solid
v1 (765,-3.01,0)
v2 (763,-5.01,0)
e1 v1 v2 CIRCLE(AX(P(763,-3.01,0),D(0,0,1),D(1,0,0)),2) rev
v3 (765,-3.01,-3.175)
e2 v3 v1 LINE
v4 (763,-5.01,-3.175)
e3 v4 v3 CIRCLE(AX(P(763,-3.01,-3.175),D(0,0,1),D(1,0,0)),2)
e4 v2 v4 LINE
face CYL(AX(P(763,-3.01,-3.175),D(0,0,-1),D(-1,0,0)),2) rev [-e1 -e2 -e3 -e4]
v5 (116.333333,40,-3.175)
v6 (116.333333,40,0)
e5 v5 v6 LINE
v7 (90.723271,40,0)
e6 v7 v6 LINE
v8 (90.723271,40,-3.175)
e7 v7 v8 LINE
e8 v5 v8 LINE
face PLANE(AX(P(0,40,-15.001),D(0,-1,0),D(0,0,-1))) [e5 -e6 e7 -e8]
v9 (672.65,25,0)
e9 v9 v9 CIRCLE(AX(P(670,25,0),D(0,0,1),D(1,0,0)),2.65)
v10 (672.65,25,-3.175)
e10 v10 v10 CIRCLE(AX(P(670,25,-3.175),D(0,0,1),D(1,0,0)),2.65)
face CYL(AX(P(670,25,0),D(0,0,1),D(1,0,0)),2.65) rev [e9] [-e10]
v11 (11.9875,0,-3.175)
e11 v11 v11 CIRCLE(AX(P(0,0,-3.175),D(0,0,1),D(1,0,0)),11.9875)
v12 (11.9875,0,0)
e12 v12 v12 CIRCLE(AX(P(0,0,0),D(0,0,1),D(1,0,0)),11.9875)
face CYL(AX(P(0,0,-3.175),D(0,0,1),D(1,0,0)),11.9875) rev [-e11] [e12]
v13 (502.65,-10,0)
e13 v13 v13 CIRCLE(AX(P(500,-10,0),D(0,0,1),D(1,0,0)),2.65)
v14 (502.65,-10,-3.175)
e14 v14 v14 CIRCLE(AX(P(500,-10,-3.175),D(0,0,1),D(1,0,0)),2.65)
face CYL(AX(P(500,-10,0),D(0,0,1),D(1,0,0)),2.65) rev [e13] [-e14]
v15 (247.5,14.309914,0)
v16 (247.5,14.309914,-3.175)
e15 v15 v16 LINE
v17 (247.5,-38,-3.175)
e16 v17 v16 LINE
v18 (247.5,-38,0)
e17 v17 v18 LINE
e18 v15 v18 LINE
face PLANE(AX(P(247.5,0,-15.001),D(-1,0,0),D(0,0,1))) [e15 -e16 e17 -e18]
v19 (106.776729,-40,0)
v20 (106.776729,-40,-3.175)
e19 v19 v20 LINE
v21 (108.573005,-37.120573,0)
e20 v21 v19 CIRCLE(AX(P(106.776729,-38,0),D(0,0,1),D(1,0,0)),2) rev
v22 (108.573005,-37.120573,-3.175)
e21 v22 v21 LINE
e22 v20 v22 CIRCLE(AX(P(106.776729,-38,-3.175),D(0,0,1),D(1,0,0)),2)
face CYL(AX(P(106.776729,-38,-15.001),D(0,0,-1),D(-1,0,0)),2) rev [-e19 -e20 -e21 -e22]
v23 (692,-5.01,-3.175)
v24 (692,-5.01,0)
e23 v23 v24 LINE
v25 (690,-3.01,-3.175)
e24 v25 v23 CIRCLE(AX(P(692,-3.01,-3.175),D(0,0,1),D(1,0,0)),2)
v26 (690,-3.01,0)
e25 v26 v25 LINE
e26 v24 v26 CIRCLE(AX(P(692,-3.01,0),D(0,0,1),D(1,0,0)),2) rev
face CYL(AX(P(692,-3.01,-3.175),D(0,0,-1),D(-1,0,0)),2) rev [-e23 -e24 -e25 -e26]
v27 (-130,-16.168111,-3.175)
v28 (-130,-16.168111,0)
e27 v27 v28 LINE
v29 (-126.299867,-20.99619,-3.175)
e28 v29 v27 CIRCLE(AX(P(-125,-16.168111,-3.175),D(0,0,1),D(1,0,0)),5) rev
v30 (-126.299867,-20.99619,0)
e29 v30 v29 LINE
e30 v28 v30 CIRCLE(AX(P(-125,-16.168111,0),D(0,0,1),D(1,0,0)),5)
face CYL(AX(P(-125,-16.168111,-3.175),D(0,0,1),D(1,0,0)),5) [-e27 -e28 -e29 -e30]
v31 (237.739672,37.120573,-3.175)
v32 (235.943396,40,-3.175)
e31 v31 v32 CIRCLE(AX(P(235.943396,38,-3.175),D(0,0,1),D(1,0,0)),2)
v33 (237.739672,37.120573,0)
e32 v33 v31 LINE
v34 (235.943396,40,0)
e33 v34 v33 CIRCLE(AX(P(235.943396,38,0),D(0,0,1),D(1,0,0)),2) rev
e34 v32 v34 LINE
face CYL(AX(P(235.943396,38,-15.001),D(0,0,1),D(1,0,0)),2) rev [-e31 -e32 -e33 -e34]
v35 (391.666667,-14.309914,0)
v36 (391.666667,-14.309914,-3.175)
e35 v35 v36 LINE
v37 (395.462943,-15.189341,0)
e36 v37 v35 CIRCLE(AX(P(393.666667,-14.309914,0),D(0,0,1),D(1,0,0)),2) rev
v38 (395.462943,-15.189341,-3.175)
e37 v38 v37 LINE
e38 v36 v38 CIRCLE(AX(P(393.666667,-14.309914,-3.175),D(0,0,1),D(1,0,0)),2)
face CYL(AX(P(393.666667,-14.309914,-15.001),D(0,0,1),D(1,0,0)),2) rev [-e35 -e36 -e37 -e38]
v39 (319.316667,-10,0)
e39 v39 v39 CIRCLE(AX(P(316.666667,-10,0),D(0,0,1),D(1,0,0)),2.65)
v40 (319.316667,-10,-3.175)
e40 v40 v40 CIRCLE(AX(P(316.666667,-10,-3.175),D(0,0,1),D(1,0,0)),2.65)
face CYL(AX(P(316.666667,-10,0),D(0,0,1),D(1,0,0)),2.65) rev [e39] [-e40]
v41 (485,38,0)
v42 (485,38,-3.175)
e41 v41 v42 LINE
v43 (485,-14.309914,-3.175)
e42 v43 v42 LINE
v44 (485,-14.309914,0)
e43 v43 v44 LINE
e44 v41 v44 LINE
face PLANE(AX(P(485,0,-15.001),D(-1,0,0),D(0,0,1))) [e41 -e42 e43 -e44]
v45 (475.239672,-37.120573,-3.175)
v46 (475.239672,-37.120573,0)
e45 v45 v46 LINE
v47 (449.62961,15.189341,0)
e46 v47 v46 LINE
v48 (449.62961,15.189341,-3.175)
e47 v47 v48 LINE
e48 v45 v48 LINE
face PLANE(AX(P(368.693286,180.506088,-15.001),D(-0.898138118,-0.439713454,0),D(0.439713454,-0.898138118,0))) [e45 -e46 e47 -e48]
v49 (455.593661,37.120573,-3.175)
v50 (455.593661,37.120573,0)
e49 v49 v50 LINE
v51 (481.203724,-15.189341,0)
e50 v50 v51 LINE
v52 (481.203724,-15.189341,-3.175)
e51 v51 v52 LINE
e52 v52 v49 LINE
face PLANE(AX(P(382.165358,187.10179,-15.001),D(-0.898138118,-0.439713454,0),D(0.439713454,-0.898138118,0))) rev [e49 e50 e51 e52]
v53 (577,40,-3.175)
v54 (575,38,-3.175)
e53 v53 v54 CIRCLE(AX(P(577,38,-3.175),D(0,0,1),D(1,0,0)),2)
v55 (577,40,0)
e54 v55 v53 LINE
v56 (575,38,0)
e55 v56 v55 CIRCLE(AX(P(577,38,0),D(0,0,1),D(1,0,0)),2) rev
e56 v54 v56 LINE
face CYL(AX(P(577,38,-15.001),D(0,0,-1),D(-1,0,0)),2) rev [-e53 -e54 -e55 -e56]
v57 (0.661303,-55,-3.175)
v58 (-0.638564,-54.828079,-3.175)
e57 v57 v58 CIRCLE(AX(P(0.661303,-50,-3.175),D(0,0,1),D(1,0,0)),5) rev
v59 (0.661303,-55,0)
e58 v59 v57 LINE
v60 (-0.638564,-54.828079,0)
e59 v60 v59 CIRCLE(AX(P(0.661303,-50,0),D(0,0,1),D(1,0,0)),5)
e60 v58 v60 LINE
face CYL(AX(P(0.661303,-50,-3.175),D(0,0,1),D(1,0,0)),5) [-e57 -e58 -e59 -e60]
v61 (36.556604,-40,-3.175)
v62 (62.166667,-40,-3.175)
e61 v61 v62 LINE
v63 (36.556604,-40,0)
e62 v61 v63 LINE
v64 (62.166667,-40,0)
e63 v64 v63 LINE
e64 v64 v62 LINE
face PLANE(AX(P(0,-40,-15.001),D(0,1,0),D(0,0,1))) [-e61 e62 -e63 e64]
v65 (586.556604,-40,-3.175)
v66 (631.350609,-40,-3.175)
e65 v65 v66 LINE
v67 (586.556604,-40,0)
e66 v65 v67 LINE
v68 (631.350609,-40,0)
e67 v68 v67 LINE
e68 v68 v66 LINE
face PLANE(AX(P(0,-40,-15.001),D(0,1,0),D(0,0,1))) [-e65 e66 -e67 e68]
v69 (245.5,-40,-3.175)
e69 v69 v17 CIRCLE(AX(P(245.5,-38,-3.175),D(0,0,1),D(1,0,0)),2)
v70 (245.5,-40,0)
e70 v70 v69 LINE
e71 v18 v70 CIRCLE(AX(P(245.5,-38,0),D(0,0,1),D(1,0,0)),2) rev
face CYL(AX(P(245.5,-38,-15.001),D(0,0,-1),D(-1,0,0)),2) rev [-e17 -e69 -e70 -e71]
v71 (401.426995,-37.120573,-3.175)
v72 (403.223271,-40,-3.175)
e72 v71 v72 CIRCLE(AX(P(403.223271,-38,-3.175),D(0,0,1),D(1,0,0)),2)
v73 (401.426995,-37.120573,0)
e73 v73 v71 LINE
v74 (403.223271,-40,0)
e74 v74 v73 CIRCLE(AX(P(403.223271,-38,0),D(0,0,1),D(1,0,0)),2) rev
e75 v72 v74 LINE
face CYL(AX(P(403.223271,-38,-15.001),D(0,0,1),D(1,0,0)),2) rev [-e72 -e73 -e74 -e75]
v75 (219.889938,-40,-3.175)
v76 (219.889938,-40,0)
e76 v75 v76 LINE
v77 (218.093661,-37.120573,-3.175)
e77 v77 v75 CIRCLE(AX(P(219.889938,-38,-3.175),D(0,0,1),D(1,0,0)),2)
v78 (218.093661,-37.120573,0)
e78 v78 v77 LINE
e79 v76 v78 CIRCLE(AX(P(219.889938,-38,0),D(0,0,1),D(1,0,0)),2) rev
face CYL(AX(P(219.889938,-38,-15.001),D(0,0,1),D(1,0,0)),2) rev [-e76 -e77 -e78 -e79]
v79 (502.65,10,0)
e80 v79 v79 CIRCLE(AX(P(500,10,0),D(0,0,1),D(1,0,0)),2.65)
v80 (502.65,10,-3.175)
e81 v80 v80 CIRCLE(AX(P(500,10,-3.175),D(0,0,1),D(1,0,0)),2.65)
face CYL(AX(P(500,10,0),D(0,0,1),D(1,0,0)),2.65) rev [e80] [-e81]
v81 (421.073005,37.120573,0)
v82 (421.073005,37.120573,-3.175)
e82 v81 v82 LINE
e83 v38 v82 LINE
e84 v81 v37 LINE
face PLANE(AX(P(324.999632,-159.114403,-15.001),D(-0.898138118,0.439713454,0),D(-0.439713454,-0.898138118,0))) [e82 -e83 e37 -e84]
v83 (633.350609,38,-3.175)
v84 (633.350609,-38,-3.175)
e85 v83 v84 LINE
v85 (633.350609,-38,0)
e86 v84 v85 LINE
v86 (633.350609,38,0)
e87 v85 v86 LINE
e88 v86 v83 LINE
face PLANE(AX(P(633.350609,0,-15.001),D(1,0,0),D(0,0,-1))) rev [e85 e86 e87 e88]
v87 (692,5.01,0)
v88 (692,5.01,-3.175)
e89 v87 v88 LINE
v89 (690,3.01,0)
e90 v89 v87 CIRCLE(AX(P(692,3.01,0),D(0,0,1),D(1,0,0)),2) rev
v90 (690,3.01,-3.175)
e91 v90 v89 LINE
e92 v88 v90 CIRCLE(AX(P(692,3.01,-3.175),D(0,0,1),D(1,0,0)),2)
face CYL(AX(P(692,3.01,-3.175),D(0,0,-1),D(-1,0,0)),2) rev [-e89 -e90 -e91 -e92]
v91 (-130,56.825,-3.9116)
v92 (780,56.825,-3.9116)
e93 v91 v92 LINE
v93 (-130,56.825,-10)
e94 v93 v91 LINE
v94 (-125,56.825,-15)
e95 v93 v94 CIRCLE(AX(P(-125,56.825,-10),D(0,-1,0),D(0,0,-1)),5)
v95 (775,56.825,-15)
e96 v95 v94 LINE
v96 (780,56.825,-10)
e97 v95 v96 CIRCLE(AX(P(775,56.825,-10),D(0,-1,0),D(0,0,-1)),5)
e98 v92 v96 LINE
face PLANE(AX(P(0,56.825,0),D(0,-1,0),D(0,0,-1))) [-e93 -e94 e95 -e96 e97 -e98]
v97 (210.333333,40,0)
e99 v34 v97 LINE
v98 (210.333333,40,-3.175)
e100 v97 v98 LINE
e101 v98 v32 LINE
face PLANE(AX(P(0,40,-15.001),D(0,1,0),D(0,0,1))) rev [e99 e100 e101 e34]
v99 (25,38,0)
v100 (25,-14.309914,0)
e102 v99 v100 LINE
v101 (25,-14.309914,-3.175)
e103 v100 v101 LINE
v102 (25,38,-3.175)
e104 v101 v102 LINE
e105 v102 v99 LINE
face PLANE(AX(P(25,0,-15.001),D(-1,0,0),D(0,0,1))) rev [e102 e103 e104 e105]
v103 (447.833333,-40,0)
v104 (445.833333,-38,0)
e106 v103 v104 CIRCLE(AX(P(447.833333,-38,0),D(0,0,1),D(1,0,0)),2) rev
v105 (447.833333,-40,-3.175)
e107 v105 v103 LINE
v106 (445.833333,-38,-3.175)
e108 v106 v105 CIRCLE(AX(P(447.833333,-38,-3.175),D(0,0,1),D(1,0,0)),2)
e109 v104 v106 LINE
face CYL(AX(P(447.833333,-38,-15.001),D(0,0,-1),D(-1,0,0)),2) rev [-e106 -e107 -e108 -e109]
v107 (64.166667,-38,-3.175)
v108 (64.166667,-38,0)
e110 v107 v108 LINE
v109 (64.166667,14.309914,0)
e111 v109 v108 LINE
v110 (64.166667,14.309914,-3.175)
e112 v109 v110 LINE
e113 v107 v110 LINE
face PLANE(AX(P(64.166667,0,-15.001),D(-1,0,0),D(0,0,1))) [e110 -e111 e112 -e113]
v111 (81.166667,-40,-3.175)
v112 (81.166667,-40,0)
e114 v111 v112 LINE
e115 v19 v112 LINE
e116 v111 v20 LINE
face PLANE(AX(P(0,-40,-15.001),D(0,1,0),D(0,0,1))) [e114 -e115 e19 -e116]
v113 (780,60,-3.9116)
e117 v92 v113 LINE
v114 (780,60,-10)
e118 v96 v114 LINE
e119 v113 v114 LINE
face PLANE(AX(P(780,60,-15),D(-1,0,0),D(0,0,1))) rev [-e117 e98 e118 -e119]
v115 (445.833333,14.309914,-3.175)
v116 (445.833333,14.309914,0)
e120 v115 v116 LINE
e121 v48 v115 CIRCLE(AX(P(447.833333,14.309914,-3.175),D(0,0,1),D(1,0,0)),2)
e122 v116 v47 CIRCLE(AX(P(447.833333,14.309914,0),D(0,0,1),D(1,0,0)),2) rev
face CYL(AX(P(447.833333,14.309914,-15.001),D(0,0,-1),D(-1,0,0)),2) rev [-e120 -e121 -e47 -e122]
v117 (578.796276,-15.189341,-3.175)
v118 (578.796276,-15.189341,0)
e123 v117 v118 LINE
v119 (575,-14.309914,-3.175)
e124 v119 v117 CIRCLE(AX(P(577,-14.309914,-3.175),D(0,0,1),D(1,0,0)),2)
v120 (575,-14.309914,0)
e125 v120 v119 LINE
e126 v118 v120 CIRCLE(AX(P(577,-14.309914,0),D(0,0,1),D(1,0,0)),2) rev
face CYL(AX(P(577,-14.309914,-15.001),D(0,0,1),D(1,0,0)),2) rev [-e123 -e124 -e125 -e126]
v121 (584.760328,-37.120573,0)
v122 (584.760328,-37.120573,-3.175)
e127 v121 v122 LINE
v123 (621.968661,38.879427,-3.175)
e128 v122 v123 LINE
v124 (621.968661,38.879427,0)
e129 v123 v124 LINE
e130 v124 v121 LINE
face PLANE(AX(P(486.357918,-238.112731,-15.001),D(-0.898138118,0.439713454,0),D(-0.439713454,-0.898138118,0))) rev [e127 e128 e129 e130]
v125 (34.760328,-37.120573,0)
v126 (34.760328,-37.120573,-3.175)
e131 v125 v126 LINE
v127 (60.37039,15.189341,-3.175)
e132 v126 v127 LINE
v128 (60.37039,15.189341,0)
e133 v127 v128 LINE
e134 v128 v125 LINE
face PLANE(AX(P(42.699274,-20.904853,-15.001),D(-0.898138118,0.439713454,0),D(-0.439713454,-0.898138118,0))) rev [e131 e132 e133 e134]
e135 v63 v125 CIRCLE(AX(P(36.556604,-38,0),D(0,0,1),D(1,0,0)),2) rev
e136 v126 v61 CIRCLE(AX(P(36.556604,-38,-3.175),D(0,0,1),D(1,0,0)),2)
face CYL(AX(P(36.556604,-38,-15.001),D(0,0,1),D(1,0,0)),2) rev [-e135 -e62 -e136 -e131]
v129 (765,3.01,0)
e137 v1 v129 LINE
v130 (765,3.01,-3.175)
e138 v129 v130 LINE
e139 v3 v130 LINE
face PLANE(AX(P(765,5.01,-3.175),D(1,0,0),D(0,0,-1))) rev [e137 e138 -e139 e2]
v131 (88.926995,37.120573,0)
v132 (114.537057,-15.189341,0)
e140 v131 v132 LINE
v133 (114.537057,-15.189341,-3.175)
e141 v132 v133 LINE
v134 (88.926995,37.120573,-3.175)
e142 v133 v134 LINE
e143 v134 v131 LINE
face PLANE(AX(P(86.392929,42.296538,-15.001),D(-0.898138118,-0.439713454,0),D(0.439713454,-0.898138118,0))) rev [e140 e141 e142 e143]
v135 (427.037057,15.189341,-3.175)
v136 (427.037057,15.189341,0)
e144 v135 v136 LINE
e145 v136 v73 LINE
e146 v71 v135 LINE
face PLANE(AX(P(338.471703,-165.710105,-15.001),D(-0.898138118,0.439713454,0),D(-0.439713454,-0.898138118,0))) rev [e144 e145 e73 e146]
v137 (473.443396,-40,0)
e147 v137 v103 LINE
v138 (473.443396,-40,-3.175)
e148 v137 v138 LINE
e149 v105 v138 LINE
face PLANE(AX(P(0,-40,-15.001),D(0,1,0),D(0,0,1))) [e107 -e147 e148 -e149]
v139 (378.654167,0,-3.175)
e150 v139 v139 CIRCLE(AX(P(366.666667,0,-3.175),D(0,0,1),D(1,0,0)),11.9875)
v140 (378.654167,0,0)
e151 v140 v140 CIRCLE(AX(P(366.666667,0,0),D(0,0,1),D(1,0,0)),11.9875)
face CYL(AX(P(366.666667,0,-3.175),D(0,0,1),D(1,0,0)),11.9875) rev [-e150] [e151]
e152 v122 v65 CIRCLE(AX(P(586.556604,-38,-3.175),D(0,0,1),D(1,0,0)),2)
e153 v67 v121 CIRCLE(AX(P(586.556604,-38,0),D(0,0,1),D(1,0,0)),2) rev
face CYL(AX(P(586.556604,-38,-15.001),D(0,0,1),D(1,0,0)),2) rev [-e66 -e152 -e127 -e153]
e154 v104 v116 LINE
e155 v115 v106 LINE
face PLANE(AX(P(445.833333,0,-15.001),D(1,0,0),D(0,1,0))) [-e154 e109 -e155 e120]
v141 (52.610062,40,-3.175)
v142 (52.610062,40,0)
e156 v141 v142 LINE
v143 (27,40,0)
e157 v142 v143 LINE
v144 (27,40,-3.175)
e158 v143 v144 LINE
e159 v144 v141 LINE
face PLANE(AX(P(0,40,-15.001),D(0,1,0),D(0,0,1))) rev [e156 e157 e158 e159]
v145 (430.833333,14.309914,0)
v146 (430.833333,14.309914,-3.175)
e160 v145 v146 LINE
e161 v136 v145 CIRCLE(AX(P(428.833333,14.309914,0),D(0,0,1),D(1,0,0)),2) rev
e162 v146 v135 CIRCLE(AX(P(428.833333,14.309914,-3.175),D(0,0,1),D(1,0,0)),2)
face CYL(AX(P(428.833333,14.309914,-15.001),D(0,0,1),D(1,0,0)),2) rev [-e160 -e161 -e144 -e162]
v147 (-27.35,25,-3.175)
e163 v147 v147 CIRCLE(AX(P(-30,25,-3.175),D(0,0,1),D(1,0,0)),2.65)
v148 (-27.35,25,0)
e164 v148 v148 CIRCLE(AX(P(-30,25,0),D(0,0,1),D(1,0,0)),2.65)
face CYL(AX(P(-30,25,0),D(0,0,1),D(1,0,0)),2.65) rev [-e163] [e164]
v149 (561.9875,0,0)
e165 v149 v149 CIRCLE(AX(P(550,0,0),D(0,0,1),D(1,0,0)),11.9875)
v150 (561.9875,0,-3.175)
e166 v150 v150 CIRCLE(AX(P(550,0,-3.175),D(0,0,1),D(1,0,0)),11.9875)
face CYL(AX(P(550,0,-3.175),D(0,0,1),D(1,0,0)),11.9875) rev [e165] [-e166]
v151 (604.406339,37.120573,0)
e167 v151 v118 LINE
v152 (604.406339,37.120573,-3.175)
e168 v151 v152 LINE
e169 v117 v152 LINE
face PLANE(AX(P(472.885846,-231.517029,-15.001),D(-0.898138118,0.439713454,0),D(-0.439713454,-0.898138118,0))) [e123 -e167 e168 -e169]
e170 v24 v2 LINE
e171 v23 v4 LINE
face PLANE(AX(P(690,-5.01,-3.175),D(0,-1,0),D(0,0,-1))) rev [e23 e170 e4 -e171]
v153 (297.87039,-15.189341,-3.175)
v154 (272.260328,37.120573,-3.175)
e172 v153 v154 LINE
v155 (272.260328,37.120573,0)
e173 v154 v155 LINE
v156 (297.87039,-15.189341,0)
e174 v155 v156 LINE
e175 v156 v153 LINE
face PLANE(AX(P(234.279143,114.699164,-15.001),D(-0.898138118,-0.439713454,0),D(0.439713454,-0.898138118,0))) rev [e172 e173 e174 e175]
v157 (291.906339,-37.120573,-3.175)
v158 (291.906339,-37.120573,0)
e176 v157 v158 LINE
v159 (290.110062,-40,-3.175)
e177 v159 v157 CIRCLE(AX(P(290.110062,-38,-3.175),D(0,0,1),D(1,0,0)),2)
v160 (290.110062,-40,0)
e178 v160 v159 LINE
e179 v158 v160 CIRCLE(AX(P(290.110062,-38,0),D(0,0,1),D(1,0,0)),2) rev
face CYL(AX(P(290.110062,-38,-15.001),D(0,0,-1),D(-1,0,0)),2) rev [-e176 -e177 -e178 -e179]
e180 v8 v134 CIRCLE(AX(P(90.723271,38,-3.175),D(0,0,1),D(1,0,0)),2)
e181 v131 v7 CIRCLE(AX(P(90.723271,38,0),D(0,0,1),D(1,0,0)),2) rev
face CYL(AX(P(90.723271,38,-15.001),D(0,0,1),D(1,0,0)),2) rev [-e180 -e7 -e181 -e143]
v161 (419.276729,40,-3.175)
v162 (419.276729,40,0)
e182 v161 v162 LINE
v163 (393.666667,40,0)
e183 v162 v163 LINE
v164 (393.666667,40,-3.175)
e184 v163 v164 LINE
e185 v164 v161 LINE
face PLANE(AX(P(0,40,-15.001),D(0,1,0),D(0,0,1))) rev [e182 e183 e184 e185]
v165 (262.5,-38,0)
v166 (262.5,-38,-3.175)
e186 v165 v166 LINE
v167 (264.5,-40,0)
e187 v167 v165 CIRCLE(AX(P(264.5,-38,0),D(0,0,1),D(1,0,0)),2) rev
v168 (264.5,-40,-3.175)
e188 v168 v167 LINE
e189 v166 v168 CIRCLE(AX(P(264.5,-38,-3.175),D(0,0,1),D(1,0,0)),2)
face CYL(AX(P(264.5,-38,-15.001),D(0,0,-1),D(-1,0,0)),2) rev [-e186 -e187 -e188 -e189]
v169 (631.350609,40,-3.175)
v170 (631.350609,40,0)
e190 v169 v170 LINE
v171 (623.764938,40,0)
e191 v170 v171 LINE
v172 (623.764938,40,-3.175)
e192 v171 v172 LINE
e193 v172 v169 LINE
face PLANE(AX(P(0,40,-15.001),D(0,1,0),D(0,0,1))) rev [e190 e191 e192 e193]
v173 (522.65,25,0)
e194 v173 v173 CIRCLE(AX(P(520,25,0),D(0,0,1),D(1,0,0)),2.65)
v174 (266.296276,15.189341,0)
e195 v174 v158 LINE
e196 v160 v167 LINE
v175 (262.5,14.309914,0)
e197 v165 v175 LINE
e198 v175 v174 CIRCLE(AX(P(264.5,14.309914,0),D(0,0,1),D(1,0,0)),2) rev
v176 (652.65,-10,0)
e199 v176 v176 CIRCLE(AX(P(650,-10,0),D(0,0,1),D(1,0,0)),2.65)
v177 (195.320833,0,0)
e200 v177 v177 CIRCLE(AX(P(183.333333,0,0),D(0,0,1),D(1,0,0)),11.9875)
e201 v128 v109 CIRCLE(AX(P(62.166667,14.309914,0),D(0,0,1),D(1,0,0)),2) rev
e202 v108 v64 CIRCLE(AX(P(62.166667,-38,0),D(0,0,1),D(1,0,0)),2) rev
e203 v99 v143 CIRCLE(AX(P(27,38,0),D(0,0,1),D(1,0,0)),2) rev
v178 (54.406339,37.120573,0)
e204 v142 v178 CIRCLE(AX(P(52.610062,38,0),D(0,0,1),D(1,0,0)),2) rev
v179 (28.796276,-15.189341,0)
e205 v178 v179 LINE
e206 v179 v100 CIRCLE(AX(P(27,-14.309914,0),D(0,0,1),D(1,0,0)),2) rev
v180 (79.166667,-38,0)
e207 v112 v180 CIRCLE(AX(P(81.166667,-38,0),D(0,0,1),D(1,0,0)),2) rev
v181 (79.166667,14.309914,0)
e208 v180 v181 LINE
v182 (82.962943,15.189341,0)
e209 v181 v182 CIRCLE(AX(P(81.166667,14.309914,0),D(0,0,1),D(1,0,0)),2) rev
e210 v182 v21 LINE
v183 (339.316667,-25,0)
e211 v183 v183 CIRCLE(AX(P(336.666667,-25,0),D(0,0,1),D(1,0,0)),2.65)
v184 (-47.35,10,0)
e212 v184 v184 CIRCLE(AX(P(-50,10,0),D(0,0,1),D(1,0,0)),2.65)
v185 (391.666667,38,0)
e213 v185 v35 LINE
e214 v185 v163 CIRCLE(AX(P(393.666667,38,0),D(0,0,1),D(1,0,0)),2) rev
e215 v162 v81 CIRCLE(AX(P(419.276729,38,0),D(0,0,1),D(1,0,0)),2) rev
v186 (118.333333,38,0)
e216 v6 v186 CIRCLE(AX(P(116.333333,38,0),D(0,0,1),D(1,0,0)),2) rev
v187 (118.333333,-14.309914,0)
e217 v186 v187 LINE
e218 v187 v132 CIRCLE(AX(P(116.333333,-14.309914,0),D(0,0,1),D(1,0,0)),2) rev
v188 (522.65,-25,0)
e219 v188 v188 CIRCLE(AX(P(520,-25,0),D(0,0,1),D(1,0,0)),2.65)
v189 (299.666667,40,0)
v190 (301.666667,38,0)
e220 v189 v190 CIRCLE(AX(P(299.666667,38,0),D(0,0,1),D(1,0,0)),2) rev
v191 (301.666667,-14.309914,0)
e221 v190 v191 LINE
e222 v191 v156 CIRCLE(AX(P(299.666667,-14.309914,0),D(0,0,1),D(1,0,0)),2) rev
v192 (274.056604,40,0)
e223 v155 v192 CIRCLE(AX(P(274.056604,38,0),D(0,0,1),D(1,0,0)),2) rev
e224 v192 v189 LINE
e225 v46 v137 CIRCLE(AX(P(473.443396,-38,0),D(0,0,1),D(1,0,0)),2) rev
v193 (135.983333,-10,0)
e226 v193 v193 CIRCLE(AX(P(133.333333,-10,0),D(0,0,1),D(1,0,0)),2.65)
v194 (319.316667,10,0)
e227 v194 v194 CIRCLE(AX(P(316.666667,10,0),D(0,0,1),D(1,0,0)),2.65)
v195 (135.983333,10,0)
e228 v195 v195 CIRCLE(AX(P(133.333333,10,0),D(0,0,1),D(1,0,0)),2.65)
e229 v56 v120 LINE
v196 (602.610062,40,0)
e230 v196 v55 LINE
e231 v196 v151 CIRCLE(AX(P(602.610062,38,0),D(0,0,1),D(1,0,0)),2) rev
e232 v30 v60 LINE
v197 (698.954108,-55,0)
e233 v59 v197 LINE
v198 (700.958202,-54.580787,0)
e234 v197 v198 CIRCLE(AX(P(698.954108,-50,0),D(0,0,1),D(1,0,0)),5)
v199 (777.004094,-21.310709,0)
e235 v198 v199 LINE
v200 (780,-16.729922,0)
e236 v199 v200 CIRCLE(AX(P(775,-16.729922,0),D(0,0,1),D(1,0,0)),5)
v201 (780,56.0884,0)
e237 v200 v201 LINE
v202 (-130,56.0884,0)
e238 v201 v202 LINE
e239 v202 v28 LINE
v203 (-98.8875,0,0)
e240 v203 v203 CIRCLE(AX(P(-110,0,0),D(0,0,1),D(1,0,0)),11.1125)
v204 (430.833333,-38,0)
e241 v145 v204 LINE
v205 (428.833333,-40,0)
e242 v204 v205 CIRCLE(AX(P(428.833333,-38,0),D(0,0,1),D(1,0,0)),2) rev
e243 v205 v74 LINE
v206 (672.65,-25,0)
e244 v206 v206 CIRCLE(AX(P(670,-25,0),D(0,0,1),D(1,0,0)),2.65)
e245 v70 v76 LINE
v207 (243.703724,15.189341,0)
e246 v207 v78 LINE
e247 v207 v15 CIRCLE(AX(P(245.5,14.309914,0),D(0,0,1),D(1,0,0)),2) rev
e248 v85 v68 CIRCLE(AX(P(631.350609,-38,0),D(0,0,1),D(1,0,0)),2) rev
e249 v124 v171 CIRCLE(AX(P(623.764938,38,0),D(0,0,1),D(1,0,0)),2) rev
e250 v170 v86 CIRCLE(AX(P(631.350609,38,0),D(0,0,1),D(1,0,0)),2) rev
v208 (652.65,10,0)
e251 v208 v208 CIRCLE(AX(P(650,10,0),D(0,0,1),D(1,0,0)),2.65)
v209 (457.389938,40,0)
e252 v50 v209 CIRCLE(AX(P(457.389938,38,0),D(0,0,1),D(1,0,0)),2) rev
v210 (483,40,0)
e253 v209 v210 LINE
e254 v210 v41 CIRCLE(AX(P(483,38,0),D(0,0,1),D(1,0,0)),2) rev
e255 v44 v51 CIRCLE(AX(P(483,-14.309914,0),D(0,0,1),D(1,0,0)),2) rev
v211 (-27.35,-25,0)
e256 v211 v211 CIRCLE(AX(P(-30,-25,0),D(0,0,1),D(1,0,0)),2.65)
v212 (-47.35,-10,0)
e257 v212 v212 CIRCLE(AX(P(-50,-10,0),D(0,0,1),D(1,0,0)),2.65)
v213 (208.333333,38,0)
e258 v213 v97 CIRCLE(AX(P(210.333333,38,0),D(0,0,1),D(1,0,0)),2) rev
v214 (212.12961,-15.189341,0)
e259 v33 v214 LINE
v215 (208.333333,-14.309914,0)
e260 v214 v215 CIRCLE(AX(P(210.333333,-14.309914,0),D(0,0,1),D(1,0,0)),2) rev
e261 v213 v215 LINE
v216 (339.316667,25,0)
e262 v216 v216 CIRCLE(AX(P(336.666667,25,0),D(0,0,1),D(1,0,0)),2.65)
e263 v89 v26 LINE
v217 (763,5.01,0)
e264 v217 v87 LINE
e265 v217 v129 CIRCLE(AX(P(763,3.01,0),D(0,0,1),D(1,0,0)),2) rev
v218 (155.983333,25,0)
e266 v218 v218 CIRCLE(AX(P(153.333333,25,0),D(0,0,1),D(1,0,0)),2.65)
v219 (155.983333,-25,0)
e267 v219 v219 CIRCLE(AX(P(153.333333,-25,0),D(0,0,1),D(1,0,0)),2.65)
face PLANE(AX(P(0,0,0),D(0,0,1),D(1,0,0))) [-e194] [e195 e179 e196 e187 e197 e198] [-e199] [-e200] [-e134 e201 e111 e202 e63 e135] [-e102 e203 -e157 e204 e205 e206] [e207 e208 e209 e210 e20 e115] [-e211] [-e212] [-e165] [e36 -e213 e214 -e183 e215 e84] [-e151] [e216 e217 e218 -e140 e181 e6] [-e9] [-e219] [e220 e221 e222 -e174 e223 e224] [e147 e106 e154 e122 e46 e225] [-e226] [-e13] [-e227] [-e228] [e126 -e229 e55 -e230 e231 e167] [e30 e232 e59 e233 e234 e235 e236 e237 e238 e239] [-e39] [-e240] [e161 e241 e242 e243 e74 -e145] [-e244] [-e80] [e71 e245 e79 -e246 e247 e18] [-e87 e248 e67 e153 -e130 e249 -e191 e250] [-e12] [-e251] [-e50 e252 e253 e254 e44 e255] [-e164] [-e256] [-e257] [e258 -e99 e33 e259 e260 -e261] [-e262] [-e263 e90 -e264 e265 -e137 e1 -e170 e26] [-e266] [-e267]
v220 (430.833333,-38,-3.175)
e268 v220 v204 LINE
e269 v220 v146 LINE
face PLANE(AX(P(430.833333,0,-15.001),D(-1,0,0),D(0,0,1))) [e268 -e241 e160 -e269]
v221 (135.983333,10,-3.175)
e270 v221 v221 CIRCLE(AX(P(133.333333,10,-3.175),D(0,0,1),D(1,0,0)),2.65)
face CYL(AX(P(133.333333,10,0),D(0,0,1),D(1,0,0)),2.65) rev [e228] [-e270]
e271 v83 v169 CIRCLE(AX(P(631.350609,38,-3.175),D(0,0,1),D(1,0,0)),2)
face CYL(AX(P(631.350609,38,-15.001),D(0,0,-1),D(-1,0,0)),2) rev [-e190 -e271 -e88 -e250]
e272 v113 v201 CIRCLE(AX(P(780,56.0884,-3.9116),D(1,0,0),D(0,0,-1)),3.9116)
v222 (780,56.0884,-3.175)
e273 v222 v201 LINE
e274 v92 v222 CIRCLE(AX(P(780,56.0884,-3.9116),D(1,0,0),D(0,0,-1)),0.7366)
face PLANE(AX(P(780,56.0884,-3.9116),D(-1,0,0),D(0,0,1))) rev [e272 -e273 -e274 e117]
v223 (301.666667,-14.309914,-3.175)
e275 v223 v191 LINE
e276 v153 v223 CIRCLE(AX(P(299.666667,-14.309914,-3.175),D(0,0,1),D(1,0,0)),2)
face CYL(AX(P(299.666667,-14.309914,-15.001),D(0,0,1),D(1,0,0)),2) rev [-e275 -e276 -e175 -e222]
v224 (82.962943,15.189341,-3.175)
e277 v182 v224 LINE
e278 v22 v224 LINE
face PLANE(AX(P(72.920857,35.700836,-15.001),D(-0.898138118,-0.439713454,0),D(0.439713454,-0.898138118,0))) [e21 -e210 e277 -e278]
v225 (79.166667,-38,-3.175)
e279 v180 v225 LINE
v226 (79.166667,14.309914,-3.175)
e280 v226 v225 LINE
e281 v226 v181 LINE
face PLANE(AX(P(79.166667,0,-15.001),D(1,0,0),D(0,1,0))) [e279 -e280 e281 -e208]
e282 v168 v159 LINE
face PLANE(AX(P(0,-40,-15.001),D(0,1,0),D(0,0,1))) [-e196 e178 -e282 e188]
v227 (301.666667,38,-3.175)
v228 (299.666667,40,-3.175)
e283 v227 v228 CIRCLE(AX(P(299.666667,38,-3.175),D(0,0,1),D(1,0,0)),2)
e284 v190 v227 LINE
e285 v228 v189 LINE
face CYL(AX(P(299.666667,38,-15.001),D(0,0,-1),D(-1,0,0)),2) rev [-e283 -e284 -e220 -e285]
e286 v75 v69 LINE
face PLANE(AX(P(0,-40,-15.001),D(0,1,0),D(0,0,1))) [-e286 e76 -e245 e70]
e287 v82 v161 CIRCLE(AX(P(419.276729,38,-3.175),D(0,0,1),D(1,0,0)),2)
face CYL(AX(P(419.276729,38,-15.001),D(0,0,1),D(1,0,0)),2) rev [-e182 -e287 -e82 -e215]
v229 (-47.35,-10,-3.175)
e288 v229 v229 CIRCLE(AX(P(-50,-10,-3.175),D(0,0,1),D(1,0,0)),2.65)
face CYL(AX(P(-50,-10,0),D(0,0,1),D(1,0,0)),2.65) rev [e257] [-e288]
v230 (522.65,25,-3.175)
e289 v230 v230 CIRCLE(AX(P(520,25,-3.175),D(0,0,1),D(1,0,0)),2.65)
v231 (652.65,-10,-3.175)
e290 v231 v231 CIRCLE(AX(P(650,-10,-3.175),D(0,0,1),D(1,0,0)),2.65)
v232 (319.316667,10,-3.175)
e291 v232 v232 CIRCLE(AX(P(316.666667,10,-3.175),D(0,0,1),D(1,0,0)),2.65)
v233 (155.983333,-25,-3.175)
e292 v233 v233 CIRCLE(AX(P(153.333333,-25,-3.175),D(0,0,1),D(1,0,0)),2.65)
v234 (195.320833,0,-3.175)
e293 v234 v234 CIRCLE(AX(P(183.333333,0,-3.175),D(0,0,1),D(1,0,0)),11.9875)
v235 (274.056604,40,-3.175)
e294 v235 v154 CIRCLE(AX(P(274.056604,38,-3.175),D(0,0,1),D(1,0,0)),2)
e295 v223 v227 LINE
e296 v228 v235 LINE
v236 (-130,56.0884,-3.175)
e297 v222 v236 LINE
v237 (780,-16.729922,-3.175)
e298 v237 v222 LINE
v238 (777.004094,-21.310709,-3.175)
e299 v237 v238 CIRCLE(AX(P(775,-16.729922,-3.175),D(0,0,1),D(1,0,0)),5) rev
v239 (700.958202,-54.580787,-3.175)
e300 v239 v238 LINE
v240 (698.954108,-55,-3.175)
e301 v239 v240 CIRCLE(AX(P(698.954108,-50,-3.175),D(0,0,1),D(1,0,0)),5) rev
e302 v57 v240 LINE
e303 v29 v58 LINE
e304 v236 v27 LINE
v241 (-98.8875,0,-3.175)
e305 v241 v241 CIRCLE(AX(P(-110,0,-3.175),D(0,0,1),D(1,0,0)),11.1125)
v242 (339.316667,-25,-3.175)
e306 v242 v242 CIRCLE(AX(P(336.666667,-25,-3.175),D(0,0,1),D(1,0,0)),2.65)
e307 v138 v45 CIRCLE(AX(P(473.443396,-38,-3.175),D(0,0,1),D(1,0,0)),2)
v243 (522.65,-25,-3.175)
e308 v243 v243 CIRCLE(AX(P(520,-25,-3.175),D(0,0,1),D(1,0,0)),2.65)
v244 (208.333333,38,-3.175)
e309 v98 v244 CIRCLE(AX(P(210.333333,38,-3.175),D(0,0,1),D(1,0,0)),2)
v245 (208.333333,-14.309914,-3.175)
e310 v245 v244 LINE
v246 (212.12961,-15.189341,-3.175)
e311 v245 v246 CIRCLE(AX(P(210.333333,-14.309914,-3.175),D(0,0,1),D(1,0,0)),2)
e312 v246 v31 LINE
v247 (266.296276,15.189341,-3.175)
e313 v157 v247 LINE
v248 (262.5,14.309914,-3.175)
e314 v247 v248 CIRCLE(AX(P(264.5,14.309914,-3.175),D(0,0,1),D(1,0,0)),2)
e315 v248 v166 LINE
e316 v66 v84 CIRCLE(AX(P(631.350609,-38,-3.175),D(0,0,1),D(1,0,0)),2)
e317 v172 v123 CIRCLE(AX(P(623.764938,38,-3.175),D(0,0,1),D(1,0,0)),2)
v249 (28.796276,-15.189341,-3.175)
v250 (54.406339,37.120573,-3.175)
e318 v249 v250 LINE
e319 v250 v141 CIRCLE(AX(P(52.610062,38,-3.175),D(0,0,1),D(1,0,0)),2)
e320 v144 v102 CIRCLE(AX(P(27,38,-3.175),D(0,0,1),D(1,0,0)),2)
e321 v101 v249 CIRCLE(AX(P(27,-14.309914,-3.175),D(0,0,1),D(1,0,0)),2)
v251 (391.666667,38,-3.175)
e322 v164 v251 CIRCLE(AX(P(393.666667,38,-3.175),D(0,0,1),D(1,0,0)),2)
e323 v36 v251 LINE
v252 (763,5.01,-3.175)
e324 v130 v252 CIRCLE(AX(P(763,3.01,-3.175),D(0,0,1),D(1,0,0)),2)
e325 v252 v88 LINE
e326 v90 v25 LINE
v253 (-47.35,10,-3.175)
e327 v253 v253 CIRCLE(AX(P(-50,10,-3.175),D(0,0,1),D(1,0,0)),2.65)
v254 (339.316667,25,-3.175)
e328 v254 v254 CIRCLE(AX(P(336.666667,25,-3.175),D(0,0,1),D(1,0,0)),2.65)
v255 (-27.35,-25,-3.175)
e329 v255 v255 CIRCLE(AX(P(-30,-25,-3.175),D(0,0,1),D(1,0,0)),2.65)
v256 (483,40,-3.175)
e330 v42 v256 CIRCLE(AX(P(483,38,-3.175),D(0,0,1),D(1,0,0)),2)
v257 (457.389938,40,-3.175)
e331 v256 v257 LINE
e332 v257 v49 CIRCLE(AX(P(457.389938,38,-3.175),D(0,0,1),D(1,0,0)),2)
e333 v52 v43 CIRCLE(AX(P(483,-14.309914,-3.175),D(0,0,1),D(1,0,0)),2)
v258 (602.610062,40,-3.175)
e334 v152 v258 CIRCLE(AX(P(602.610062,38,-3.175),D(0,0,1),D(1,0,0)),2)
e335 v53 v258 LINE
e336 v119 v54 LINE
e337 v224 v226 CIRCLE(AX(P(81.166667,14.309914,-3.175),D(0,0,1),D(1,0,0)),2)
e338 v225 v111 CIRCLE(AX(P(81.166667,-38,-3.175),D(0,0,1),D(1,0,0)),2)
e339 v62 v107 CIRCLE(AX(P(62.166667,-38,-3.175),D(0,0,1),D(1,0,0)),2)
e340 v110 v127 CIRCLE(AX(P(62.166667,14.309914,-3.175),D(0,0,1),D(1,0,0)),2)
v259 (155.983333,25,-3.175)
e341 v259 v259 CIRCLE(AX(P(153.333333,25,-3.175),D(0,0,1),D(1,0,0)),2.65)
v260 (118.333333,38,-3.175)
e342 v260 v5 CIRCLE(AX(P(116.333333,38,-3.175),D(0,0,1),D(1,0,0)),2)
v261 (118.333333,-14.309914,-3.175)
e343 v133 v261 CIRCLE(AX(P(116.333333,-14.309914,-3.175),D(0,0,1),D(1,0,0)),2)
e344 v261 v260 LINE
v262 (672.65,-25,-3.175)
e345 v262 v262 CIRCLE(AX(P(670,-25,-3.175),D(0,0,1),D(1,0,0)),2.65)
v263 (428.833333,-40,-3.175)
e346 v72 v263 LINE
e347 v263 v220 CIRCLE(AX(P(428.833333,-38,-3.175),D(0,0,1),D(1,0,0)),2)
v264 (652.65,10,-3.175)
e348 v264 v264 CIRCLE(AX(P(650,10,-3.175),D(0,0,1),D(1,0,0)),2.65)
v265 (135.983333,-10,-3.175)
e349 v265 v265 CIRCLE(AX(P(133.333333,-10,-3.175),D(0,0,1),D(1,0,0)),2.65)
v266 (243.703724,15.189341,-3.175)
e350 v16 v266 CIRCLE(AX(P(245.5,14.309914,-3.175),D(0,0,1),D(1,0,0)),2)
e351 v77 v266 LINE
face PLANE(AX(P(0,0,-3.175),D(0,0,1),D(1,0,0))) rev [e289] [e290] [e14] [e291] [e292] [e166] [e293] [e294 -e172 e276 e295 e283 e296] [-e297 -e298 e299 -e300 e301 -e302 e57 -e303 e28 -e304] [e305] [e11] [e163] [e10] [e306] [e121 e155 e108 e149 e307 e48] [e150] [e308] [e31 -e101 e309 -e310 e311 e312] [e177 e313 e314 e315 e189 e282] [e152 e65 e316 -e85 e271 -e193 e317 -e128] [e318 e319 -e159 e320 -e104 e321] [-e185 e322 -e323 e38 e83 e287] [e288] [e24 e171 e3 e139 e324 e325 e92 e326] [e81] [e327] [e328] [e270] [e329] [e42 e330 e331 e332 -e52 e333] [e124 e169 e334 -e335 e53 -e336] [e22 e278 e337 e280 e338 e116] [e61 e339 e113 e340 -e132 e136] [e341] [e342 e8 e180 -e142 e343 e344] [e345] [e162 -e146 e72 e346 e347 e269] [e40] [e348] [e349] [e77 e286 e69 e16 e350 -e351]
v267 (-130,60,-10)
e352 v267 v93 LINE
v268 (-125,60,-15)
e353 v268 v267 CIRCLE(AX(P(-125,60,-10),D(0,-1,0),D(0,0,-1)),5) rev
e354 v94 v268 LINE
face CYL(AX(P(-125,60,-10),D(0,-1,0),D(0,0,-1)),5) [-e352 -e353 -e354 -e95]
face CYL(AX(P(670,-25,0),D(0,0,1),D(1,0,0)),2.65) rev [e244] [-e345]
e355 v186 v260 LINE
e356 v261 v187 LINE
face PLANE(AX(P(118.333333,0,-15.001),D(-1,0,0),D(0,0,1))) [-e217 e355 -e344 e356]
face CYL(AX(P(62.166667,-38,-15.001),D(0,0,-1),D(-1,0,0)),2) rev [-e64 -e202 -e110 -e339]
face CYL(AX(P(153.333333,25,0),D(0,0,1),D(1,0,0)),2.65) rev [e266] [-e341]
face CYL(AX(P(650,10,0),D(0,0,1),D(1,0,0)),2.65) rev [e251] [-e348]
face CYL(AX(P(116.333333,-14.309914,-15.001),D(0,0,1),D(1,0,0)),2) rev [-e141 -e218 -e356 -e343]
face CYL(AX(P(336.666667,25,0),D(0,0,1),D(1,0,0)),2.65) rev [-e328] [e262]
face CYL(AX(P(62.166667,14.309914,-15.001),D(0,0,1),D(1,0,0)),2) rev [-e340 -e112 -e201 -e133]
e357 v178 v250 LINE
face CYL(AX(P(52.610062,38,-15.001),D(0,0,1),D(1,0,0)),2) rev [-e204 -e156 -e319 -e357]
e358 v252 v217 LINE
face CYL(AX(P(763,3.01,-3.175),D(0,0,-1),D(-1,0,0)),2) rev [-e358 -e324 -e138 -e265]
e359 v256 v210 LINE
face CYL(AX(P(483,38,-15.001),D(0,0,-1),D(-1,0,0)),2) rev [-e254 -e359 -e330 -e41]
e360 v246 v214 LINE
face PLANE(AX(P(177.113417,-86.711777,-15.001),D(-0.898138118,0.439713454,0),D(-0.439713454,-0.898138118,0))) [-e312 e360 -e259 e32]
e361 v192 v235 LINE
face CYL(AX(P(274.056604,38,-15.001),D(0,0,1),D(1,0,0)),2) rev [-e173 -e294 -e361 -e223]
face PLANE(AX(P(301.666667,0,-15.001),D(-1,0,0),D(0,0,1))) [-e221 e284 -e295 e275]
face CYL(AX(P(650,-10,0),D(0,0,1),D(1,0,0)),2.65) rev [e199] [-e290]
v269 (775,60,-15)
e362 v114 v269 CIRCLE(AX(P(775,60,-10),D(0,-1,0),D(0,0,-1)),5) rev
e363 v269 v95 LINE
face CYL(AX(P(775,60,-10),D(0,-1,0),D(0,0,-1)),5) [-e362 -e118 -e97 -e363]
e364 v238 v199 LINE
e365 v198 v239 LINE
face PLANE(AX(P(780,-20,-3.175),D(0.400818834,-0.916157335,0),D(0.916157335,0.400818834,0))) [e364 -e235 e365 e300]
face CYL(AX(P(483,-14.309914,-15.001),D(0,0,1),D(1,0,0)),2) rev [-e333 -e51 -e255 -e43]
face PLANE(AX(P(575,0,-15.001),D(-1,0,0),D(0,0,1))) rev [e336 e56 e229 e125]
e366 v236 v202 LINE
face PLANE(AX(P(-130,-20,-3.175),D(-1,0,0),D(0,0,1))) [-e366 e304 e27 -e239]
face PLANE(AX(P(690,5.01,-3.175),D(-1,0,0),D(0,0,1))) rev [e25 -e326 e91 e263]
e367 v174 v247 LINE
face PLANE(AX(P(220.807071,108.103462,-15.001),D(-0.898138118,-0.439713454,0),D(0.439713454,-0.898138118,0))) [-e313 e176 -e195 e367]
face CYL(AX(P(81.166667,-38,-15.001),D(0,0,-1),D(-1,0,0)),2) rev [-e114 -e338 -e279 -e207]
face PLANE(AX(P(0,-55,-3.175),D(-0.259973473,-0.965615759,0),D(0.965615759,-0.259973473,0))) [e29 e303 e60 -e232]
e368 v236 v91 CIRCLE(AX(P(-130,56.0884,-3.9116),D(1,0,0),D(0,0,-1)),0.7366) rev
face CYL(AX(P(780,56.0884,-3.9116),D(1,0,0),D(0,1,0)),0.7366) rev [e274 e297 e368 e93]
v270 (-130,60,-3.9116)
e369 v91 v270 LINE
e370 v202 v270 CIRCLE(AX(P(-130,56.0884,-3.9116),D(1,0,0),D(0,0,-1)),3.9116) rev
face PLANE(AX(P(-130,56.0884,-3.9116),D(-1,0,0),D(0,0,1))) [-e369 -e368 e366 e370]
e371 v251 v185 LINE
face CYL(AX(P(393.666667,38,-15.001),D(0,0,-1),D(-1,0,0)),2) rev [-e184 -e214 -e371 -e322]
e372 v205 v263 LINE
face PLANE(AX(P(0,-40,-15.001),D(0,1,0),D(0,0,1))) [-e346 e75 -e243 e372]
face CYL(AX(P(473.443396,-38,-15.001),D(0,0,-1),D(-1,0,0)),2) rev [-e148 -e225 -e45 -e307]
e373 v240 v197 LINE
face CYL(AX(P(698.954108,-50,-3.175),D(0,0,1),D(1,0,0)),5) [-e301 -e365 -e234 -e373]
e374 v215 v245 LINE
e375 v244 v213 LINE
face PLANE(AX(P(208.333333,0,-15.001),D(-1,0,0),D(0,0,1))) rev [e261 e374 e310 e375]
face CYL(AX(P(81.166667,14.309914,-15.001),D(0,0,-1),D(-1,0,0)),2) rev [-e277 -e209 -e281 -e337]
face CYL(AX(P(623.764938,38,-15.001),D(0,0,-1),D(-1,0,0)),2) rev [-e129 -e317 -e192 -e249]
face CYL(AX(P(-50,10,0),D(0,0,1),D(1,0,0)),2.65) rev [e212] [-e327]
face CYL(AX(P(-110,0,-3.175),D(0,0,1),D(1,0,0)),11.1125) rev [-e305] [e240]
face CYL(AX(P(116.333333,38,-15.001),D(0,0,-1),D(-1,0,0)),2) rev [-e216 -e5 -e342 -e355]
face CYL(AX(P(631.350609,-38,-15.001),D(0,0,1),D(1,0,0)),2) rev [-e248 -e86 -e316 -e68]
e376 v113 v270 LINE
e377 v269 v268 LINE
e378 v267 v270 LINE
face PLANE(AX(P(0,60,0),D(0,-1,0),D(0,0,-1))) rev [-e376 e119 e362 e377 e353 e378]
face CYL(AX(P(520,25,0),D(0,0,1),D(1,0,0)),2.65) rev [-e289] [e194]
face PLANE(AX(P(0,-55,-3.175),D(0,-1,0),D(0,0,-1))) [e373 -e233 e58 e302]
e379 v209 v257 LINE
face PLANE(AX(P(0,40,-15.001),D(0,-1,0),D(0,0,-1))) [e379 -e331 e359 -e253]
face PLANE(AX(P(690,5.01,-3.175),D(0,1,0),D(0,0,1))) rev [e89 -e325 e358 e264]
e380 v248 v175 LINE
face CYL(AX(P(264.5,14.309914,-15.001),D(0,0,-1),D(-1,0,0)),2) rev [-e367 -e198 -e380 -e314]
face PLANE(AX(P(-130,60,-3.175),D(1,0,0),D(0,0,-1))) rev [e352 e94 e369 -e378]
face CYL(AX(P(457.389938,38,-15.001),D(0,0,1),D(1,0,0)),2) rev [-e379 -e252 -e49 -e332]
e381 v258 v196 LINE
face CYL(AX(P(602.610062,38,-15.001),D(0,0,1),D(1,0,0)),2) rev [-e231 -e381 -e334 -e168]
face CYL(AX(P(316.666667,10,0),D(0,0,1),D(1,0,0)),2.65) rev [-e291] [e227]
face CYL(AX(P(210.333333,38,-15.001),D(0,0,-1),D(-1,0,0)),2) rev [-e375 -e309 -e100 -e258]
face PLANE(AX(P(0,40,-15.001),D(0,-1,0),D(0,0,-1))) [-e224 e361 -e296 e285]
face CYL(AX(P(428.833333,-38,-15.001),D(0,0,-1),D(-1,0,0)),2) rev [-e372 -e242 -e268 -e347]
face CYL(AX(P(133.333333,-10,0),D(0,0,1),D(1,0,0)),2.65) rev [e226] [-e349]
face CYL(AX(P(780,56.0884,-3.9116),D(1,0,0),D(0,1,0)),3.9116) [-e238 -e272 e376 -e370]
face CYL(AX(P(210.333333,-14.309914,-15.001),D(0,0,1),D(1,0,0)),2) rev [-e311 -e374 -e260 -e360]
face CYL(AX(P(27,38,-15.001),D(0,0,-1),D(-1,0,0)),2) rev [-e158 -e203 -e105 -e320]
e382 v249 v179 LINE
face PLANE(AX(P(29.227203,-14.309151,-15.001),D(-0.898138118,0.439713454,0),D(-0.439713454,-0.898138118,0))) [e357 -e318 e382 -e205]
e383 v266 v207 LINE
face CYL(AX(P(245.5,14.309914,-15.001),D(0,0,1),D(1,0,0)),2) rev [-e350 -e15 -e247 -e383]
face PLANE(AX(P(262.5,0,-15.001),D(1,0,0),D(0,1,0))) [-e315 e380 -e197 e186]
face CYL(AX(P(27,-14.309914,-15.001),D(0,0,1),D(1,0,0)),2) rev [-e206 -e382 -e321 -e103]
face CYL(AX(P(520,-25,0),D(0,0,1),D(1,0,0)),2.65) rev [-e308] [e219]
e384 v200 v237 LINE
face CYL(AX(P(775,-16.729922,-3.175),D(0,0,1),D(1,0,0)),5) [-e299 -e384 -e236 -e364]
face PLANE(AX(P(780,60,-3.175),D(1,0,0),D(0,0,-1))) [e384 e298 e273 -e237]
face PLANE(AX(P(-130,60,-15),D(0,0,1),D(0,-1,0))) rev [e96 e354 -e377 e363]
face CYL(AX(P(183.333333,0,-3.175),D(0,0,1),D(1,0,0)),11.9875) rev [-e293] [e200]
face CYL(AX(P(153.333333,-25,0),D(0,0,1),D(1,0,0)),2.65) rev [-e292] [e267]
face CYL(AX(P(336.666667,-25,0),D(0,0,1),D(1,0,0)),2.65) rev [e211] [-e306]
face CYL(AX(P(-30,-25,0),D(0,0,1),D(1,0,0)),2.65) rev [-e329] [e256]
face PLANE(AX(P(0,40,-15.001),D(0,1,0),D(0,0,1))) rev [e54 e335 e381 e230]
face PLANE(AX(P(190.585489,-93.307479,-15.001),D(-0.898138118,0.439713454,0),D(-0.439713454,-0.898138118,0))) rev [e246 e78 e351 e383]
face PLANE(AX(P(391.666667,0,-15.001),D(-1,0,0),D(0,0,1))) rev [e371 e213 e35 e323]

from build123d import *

# Parameters (mm, degrees)
SKETCH1_R                    = 11.9875
SKETCH1_R_2                  = 11.1125
SKETCH1_W                    = 75
SKETCH1_H                    = 10.02
BASE_FLANGE1_DEPTH           = 3.175
EDGE_FLANGE1_STRIP_W         = 14.1732
EDGE_FLANGE1_STRIP_H         = 3.175
EDGE_FLANGE1_STRIP_CUT_DEPTH = 910
EDGE_FLANGE1_DEPTH           = 910
M5_CLEARANCE_HOLE1_D         = 5.3
CUT_EXTRUDE2_REACH           = 784.448
FILLET1_R                    = 2
FILLET2_R                    = 5


# Sheet-metal steps are written as plain solids
with BuildPart() as part:
    # Sketch1 → Base-Flange1 (new body)
    with BuildSketch(Plane.XY):
        Polygon((-130, 60), (780, 60), (780, -20), (700, -55), (0, -55), (-130, -20), align=None)
        Circle(SKETCH1_R, mode=Mode.SUBTRACT)
        with Locations((183.333333333, 0)):
            Circle(SKETCH1_R, mode=Mode.SUBTRACT)
        with Locations((366.666666667, 0)):
            Circle(SKETCH1_R, mode=Mode.SUBTRACT)
        with Locations((550, 0)):
            Circle(SKETCH1_R, mode=Mode.SUBTRACT)
        with Locations((-110, 0)):
            Circle(SKETCH1_R_2, mode=Mode.SUBTRACT)
        with Locations((727.5, 0)):
            Rectangle(SKETCH1_W, SKETCH1_H, mode=Mode.SUBTRACT)
    extrude(amount=-BASE_FLANGE1_DEPTH)

    # Edge-Flange1 strip (across the edge) → Edge-Flange1 strip cut (cut)
    with BuildSketch(Plane(origin=(-130, 60, -3.175), x_dir=(0, -1, 0), z_dir=(1, 0, 0))):
        with Locations((-3.175, -1.5875)):
            Rectangle(EDGE_FLANGE1_STRIP_W, EDGE_FLANGE1_STRIP_H)
    extrude(amount=EDGE_FLANGE1_STRIP_CUT_DEPTH, mode=Mode.SUBTRACT)

    # Edge-Flange1 section (across the edge) → Edge-Flange1 (add)
    with BuildSketch(Plane(origin=(-130, 60, -3.175), x_dir=(0, -1, 0), z_dir=(1, 0, 0))):
        with BuildLine():
            Line((0, 0.7366), (0, 11.825))
            Line((0, 11.825), (3.175, 11.825))
            Line((3.175, 11.825), (3.175, 0.7366))
            ThreePointArc((3.175, 0.7366), (3.390745145, 0.215745145), (3.9116, 0))
            Line((3.9116, 0), (3.9116, -3.175))
            ThreePointArc((3.9116, -3.175), (1.145681115, -2.029318885), (0, 0.7366))
        make_face()
    extrude(amount=EDGE_FLANGE1_DEPTH)

    # M5 Clearance Hole1 (through all)
    with Locations(Plane(origin=(-50, 10, 0), x_dir=(1, 0, 0), z_dir=(0, 0, 1))):
        with Locations((0, 0), (0, -20), (20, -35), (20, 15), (183.333333333, 0), (183.333333333, -20), (203.333333333, -35), (203.333333333, 15), (366.666666667, 0), (366.666666667, -20), (386.666666667, -35), (386.666666667, 15), (550, 0), (550, -20), (570, -35), (570, 15), (700, 0), (700, -20), (720, 15), (720, -35)):
            Hole(M5_CLEARANCE_HOLE1_D / 2)

    # Sketch8 → Cut-Extrude2 (cut, up to next)
    with BuildSketch(Plane.XY, mode=Mode.PRIVATE) as cut_extrude2_sk1:
        Polygon((55.816057945, 40), (25, 40), (25, -22.943437506), align=None)
    cut_extrude2_tool1 = extrude(cut_extrude2_sk1.sketch, amount=-CUT_EXTRUDE2_REACH, mode=Mode.PRIVATE) & part.part
    # Sketch8 → Cut-Extrude2 (cut, up to next)
    with BuildSketch(Plane.XY, mode=Mode.PRIVATE) as cut_extrude2_sk2:
        Polygon((64.166666667, -40), (33.350608721, -40), (64.166666667, 22.943437506), align=None)
    cut_extrude2_tool2 = extrude(cut_extrude2_sk2.sketch, amount=-CUT_EXTRUDE2_REACH, mode=Mode.PRIVATE) & part.part
    # Sketch8 → Cut-Extrude2 (cut, up to next)
    with BuildSketch(Plane.XY, mode=Mode.PRIVATE) as cut_extrude2_sk3:
        Polygon((79.166666667, -40), (79.166666667, 22.943437506), (109.982724612, -40), align=None)
    cut_extrude2_tool3 = extrude(cut_extrude2_sk3.sketch, amount=-CUT_EXTRUDE2_REACH, mode=Mode.PRIVATE) & part.part
    # Sketch8 → Cut-Extrude2 (cut, up to next)
    with BuildSketch(Plane.XY, mode=Mode.PRIVATE) as cut_extrude2_sk4:
        Polygon((118.333333333, 40), (118.333333333, -22.943437506), (87.517275388, 40), align=None)
    cut_extrude2_tool4 = extrude(cut_extrude2_sk4.sketch, amount=-CUT_EXTRUDE2_REACH, mode=Mode.PRIVATE) & part.part
    # Sketch8 → Cut-Extrude2 (cut, up to next)
    with BuildSketch(Plane.XY, mode=Mode.PRIVATE) as cut_extrude2_sk5:
        Polygon((239.149391279, 40), (208.333333333, -22.943437506), (208.333333333, 40), align=None)
    cut_extrude2_tool5 = extrude(cut_extrude2_sk5.sketch, amount=-CUT_EXTRUDE2_REACH, mode=Mode.PRIVATE) & part.part
    # Sketch8 → Cut-Extrude2 (cut, up to next)
    with BuildSketch(Plane.XY, mode=Mode.PRIVATE) as cut_extrude2_sk6:
        Polygon((247.5, 22.943437506), (247.5, -40), (216.683942055, -40), align=None)
    cut_extrude2_tool6 = extrude(cut_extrude2_sk6.sketch, amount=-CUT_EXTRUDE2_REACH, mode=Mode.PRIVATE) & part.part
    # Sketch8 → Cut-Extrude2 (cut, up to next)
    with BuildSketch(Plane.XY, mode=Mode.PRIVATE) as cut_extrude2_sk7:
        Polygon((293.316057945, -40), (262.5, -40), (262.5, 22.943437506), align=None)
    cut_extrude2_tool7 = extrude(cut_extrude2_sk7.sketch, amount=-CUT_EXTRUDE2_REACH, mode=Mode.PRIVATE) & part.part
    # Sketch8 → Cut-Extrude2 (cut, up to next)
    with BuildSketch(Plane.XY, mode=Mode.PRIVATE) as cut_extrude2_sk8:
        Polygon((270.850608721, 40), (301.666666667, 40), (301.666666667, -22.943437506), align=None)
    cut_extrude2_tool8 = extrude(cut_extrude2_sk8.sketch, amount=-CUT_EXTRUDE2_REACH, mode=Mode.PRIVATE) & part.part
    # Sketch8 → Cut-Extrude2 (cut, up to next)
    with BuildSketch(Plane.XY, mode=Mode.PRIVATE) as cut_extrude2_sk9:
        Polygon((422.482724612, 40), (391.666666667, -22.943437506), (391.666666667, 40), align=None)
    cut_extrude2_tool9 = extrude(cut_extrude2_sk9.sketch, amount=-CUT_EXTRUDE2_REACH, mode=Mode.PRIVATE) & part.part
    # Sketch8 → Cut-Extrude2 (cut, up to next)
    with BuildSketch(Plane.XY, mode=Mode.PRIVATE) as cut_extrude2_sk10:
        Polygon((430.833333333, 22.943437506), (430.833333333, -40), (400.017275388, -40), align=None)
    cut_extrude2_tool10 = extrude(cut_extrude2_sk10.sketch, amount=-CUT_EXTRUDE2_REACH, mode=Mode.PRIVATE) & part.part
    # Sketch8 → Cut-Extrude2 (cut, up to next)
    with BuildSketch(Plane.XY, mode=Mode.PRIVATE) as cut_extrude2_sk11:
        Polygon((476.649391279, -40), (445.833333333, -40), (445.833333333, 22.943437506), align=None)
    cut_extrude2_tool11 = extrude(cut_extrude2_sk11.sketch, amount=-CUT_EXTRUDE2_REACH, mode=Mode.PRIVATE) & part.part
    # Sketch8 → Cut-Extrude2 (cut, up to next)
    with BuildSketch(Plane.XY, mode=Mode.PRIVATE) as cut_extrude2_sk12:
        Polygon((454.183942055, 40), (485, 40), (485, -22.943437506), align=None)
    cut_extrude2_tool12 = extrude(cut_extrude2_sk12.sketch, amount=-CUT_EXTRUDE2_REACH, mode=Mode.PRIVATE) & part.part
    # Sketch8 → Cut-Extrude2 (cut, up to next)
    with BuildSketch(Plane.XY, mode=Mode.PRIVATE) as cut_extrude2_sk13:
        Polygon((605.816057945, 40), (575, -22.943437506), (575, 40), align=None)
    cut_extrude2_tool13 = extrude(cut_extrude2_sk13.sketch, amount=-CUT_EXTRUDE2_REACH, mode=Mode.PRIVATE) & part.part
    # Sketch8 → Cut-Extrude2 (cut, up to next)
    with BuildSketch(Plane.XY, mode=Mode.PRIVATE) as cut_extrude2_sk14:
        Polygon((614.166666667, 22.943437506), (614.166666667, -40), (583.350608721, -40), align=None)
    cut_extrude2_tool14 = extrude(cut_extrude2_sk14.sketch, amount=-CUT_EXTRUDE2_REACH, mode=Mode.PRIVATE) & part.part
    # Sketch8 → Cut-Extrude2 (cut, up to next)
    with BuildSketch(Plane.XY, mode=Mode.PRIVATE) as cut_extrude2_sk15:
        Polygon((633.350608721, 40), (622.517275388, 40), (614.166666667, 22.943437506), (614.166666667, -40), (633.350608721, -40), align=None)
    cut_extrude2_tool15 = extrude(cut_extrude2_sk15.sketch, amount=-CUT_EXTRUDE2_REACH, mode=Mode.PRIVATE) & part.part
    add(cut_extrude2_tool1.solids().sort_by_distance((35.272019, 19.018854, 0))[0], mode=Mode.SUBTRACT)
    add(cut_extrude2_tool2.solids().sort_by_distance((53.894647, -19.018854, 0))[0], mode=Mode.SUBTRACT)
    add(cut_extrude2_tool3.solids().sort_by_distance((89.438686, -19.018854, 0))[0], mode=Mode.SUBTRACT)
    add(cut_extrude2_tool4.solids().sort_by_distance((108.061314, 19.018854, 0))[0], mode=Mode.SUBTRACT)
    add(cut_extrude2_tool5.solids().sort_by_distance((218.605353, 19.018854, 0))[0], mode=Mode.SUBTRACT)
    add(cut_extrude2_tool6.solids().sort_by_distance((237.227981, -19.018854, 0))[0], mode=Mode.SUBTRACT)
    add(cut_extrude2_tool7.solids().sort_by_distance((272.772019, -19.018854, 0))[0], mode=Mode.SUBTRACT)
    add(cut_extrude2_tool8.solids().sort_by_distance((291.394647, 19.018854, 0))[0], mode=Mode.SUBTRACT)
    add(cut_extrude2_tool9.solids().sort_by_distance((401.938686, 19.018854, 0))[0], mode=Mode.SUBTRACT)
    add(cut_extrude2_tool10.solids().sort_by_distance((420.561314, -19.018854, 0))[0], mode=Mode.SUBTRACT)
    add(cut_extrude2_tool11.solids().sort_by_distance((456.105353, -19.018854, 0))[0], mode=Mode.SUBTRACT)
    add(cut_extrude2_tool12.solids().sort_by_distance((474.727981, 19.018854, 0))[0], mode=Mode.SUBTRACT)
    add(cut_extrude2_tool13.solids().sort_by_distance((585.272019, 19.018854, 0))[0], mode=Mode.SUBTRACT)
    add(cut_extrude2_tool14.solids().sort_by_distance((603.894647, -19.018854, 0))[0], mode=Mode.SUBTRACT)
    add(cut_extrude2_tool15.solids().sort_by_distance((624.089948, -1.669801, 0))[0], mode=Mode.SUBTRACT)

    # Fillet1
    fillet1_edges = [part.edges().sort_by_distance(p)[0] for p in [
        (247.5, 22.943437506, -1.5875),
        (247.5, -40, -1.5875),
        (216.683942055, -40, -1.5875),
        (293.316057945, -40, -1.5875),
        (262.5, -40, -1.5875),
        (262.5, 22.943437506, -1.5875),
        (270.850608721, 40, -1.5875),
        (301.666666667, 40, -1.5875),
        (301.666666667, -22.943437506, -1.5875),
        (422.482724612, 40, -1.5875),
        (391.666666667, -22.943437506, -1.5875),
        (391.666666667, 40, -1.5875),
        (64.166666667, -40, -1.5875),
        (33.350608721, -40, -1.5875),
        (690, -5.01, -1.5875),
        (64.166666667, 22.943437506, -1.5875),
        (690, 5.01, -1.5875),
        (79.166666667, -40, -1.5875),
        (79.166666667, 22.943437506, -1.5875),
        (109.982724612, -40, -1.5875),
        (765, 5.01, -1.5875),
        (118.333333333, 40, -1.5875),
        (118.333333333, -22.943437506, -1.5875),
        (87.517275388, 40, -1.5875),
        (765, -5.01, -1.5875),
        (239.149391279, 40, -1.5875),
        (208.333333333, -22.943437506, -1.5875),
        (208.333333333, 40, -1.5875),
        (633.350608721, -40, -1.5875),
        (583.350608721, -40, -1.5875),
        (622.517275388, 40, -1.5875),
        (633.350608721, 40, -1.5875),
        (430.833333333, 22.943437506, -1.5875),
        (430.833333333, -40, -1.5875),
        (400.017275388, -40, -1.5875),
        (476.649391279, -40, -1.5875),
        (445.833333333, -40, -1.5875),
        (445.833333333, 22.943437506, -1.5875),
        (454.183942055, 40, -1.5875),
        (485, 40, -1.5875),
        (485, -22.943437506, -1.5875),
        (605.816057945, 40, -1.5875),
        (575, -22.943437506, -1.5875),
        (575, 40, -1.5875),
        (25, 40, -1.5875),
        (55.816057945, 40, -1.5875),
        (25, -22.943437506, -1.5875),
    ]]
    fillet(fillet1_edges, radius=FILLET1_R)

    # Fillet2
    fillet2_edges = [part.edges().sort_by_distance(p)[0] for p in [
        (780, -20, -1.5875),
        (700, -55, -1.5875),
        (0, -55, -1.5875),
        (-130, -20, -1.5875),
        (-130, 58.4125, -15),
        (780, 58.4125, -15),
    ]]
    fillet(fillet2_edges, radius=FILLET2_R)


solid = part.part
